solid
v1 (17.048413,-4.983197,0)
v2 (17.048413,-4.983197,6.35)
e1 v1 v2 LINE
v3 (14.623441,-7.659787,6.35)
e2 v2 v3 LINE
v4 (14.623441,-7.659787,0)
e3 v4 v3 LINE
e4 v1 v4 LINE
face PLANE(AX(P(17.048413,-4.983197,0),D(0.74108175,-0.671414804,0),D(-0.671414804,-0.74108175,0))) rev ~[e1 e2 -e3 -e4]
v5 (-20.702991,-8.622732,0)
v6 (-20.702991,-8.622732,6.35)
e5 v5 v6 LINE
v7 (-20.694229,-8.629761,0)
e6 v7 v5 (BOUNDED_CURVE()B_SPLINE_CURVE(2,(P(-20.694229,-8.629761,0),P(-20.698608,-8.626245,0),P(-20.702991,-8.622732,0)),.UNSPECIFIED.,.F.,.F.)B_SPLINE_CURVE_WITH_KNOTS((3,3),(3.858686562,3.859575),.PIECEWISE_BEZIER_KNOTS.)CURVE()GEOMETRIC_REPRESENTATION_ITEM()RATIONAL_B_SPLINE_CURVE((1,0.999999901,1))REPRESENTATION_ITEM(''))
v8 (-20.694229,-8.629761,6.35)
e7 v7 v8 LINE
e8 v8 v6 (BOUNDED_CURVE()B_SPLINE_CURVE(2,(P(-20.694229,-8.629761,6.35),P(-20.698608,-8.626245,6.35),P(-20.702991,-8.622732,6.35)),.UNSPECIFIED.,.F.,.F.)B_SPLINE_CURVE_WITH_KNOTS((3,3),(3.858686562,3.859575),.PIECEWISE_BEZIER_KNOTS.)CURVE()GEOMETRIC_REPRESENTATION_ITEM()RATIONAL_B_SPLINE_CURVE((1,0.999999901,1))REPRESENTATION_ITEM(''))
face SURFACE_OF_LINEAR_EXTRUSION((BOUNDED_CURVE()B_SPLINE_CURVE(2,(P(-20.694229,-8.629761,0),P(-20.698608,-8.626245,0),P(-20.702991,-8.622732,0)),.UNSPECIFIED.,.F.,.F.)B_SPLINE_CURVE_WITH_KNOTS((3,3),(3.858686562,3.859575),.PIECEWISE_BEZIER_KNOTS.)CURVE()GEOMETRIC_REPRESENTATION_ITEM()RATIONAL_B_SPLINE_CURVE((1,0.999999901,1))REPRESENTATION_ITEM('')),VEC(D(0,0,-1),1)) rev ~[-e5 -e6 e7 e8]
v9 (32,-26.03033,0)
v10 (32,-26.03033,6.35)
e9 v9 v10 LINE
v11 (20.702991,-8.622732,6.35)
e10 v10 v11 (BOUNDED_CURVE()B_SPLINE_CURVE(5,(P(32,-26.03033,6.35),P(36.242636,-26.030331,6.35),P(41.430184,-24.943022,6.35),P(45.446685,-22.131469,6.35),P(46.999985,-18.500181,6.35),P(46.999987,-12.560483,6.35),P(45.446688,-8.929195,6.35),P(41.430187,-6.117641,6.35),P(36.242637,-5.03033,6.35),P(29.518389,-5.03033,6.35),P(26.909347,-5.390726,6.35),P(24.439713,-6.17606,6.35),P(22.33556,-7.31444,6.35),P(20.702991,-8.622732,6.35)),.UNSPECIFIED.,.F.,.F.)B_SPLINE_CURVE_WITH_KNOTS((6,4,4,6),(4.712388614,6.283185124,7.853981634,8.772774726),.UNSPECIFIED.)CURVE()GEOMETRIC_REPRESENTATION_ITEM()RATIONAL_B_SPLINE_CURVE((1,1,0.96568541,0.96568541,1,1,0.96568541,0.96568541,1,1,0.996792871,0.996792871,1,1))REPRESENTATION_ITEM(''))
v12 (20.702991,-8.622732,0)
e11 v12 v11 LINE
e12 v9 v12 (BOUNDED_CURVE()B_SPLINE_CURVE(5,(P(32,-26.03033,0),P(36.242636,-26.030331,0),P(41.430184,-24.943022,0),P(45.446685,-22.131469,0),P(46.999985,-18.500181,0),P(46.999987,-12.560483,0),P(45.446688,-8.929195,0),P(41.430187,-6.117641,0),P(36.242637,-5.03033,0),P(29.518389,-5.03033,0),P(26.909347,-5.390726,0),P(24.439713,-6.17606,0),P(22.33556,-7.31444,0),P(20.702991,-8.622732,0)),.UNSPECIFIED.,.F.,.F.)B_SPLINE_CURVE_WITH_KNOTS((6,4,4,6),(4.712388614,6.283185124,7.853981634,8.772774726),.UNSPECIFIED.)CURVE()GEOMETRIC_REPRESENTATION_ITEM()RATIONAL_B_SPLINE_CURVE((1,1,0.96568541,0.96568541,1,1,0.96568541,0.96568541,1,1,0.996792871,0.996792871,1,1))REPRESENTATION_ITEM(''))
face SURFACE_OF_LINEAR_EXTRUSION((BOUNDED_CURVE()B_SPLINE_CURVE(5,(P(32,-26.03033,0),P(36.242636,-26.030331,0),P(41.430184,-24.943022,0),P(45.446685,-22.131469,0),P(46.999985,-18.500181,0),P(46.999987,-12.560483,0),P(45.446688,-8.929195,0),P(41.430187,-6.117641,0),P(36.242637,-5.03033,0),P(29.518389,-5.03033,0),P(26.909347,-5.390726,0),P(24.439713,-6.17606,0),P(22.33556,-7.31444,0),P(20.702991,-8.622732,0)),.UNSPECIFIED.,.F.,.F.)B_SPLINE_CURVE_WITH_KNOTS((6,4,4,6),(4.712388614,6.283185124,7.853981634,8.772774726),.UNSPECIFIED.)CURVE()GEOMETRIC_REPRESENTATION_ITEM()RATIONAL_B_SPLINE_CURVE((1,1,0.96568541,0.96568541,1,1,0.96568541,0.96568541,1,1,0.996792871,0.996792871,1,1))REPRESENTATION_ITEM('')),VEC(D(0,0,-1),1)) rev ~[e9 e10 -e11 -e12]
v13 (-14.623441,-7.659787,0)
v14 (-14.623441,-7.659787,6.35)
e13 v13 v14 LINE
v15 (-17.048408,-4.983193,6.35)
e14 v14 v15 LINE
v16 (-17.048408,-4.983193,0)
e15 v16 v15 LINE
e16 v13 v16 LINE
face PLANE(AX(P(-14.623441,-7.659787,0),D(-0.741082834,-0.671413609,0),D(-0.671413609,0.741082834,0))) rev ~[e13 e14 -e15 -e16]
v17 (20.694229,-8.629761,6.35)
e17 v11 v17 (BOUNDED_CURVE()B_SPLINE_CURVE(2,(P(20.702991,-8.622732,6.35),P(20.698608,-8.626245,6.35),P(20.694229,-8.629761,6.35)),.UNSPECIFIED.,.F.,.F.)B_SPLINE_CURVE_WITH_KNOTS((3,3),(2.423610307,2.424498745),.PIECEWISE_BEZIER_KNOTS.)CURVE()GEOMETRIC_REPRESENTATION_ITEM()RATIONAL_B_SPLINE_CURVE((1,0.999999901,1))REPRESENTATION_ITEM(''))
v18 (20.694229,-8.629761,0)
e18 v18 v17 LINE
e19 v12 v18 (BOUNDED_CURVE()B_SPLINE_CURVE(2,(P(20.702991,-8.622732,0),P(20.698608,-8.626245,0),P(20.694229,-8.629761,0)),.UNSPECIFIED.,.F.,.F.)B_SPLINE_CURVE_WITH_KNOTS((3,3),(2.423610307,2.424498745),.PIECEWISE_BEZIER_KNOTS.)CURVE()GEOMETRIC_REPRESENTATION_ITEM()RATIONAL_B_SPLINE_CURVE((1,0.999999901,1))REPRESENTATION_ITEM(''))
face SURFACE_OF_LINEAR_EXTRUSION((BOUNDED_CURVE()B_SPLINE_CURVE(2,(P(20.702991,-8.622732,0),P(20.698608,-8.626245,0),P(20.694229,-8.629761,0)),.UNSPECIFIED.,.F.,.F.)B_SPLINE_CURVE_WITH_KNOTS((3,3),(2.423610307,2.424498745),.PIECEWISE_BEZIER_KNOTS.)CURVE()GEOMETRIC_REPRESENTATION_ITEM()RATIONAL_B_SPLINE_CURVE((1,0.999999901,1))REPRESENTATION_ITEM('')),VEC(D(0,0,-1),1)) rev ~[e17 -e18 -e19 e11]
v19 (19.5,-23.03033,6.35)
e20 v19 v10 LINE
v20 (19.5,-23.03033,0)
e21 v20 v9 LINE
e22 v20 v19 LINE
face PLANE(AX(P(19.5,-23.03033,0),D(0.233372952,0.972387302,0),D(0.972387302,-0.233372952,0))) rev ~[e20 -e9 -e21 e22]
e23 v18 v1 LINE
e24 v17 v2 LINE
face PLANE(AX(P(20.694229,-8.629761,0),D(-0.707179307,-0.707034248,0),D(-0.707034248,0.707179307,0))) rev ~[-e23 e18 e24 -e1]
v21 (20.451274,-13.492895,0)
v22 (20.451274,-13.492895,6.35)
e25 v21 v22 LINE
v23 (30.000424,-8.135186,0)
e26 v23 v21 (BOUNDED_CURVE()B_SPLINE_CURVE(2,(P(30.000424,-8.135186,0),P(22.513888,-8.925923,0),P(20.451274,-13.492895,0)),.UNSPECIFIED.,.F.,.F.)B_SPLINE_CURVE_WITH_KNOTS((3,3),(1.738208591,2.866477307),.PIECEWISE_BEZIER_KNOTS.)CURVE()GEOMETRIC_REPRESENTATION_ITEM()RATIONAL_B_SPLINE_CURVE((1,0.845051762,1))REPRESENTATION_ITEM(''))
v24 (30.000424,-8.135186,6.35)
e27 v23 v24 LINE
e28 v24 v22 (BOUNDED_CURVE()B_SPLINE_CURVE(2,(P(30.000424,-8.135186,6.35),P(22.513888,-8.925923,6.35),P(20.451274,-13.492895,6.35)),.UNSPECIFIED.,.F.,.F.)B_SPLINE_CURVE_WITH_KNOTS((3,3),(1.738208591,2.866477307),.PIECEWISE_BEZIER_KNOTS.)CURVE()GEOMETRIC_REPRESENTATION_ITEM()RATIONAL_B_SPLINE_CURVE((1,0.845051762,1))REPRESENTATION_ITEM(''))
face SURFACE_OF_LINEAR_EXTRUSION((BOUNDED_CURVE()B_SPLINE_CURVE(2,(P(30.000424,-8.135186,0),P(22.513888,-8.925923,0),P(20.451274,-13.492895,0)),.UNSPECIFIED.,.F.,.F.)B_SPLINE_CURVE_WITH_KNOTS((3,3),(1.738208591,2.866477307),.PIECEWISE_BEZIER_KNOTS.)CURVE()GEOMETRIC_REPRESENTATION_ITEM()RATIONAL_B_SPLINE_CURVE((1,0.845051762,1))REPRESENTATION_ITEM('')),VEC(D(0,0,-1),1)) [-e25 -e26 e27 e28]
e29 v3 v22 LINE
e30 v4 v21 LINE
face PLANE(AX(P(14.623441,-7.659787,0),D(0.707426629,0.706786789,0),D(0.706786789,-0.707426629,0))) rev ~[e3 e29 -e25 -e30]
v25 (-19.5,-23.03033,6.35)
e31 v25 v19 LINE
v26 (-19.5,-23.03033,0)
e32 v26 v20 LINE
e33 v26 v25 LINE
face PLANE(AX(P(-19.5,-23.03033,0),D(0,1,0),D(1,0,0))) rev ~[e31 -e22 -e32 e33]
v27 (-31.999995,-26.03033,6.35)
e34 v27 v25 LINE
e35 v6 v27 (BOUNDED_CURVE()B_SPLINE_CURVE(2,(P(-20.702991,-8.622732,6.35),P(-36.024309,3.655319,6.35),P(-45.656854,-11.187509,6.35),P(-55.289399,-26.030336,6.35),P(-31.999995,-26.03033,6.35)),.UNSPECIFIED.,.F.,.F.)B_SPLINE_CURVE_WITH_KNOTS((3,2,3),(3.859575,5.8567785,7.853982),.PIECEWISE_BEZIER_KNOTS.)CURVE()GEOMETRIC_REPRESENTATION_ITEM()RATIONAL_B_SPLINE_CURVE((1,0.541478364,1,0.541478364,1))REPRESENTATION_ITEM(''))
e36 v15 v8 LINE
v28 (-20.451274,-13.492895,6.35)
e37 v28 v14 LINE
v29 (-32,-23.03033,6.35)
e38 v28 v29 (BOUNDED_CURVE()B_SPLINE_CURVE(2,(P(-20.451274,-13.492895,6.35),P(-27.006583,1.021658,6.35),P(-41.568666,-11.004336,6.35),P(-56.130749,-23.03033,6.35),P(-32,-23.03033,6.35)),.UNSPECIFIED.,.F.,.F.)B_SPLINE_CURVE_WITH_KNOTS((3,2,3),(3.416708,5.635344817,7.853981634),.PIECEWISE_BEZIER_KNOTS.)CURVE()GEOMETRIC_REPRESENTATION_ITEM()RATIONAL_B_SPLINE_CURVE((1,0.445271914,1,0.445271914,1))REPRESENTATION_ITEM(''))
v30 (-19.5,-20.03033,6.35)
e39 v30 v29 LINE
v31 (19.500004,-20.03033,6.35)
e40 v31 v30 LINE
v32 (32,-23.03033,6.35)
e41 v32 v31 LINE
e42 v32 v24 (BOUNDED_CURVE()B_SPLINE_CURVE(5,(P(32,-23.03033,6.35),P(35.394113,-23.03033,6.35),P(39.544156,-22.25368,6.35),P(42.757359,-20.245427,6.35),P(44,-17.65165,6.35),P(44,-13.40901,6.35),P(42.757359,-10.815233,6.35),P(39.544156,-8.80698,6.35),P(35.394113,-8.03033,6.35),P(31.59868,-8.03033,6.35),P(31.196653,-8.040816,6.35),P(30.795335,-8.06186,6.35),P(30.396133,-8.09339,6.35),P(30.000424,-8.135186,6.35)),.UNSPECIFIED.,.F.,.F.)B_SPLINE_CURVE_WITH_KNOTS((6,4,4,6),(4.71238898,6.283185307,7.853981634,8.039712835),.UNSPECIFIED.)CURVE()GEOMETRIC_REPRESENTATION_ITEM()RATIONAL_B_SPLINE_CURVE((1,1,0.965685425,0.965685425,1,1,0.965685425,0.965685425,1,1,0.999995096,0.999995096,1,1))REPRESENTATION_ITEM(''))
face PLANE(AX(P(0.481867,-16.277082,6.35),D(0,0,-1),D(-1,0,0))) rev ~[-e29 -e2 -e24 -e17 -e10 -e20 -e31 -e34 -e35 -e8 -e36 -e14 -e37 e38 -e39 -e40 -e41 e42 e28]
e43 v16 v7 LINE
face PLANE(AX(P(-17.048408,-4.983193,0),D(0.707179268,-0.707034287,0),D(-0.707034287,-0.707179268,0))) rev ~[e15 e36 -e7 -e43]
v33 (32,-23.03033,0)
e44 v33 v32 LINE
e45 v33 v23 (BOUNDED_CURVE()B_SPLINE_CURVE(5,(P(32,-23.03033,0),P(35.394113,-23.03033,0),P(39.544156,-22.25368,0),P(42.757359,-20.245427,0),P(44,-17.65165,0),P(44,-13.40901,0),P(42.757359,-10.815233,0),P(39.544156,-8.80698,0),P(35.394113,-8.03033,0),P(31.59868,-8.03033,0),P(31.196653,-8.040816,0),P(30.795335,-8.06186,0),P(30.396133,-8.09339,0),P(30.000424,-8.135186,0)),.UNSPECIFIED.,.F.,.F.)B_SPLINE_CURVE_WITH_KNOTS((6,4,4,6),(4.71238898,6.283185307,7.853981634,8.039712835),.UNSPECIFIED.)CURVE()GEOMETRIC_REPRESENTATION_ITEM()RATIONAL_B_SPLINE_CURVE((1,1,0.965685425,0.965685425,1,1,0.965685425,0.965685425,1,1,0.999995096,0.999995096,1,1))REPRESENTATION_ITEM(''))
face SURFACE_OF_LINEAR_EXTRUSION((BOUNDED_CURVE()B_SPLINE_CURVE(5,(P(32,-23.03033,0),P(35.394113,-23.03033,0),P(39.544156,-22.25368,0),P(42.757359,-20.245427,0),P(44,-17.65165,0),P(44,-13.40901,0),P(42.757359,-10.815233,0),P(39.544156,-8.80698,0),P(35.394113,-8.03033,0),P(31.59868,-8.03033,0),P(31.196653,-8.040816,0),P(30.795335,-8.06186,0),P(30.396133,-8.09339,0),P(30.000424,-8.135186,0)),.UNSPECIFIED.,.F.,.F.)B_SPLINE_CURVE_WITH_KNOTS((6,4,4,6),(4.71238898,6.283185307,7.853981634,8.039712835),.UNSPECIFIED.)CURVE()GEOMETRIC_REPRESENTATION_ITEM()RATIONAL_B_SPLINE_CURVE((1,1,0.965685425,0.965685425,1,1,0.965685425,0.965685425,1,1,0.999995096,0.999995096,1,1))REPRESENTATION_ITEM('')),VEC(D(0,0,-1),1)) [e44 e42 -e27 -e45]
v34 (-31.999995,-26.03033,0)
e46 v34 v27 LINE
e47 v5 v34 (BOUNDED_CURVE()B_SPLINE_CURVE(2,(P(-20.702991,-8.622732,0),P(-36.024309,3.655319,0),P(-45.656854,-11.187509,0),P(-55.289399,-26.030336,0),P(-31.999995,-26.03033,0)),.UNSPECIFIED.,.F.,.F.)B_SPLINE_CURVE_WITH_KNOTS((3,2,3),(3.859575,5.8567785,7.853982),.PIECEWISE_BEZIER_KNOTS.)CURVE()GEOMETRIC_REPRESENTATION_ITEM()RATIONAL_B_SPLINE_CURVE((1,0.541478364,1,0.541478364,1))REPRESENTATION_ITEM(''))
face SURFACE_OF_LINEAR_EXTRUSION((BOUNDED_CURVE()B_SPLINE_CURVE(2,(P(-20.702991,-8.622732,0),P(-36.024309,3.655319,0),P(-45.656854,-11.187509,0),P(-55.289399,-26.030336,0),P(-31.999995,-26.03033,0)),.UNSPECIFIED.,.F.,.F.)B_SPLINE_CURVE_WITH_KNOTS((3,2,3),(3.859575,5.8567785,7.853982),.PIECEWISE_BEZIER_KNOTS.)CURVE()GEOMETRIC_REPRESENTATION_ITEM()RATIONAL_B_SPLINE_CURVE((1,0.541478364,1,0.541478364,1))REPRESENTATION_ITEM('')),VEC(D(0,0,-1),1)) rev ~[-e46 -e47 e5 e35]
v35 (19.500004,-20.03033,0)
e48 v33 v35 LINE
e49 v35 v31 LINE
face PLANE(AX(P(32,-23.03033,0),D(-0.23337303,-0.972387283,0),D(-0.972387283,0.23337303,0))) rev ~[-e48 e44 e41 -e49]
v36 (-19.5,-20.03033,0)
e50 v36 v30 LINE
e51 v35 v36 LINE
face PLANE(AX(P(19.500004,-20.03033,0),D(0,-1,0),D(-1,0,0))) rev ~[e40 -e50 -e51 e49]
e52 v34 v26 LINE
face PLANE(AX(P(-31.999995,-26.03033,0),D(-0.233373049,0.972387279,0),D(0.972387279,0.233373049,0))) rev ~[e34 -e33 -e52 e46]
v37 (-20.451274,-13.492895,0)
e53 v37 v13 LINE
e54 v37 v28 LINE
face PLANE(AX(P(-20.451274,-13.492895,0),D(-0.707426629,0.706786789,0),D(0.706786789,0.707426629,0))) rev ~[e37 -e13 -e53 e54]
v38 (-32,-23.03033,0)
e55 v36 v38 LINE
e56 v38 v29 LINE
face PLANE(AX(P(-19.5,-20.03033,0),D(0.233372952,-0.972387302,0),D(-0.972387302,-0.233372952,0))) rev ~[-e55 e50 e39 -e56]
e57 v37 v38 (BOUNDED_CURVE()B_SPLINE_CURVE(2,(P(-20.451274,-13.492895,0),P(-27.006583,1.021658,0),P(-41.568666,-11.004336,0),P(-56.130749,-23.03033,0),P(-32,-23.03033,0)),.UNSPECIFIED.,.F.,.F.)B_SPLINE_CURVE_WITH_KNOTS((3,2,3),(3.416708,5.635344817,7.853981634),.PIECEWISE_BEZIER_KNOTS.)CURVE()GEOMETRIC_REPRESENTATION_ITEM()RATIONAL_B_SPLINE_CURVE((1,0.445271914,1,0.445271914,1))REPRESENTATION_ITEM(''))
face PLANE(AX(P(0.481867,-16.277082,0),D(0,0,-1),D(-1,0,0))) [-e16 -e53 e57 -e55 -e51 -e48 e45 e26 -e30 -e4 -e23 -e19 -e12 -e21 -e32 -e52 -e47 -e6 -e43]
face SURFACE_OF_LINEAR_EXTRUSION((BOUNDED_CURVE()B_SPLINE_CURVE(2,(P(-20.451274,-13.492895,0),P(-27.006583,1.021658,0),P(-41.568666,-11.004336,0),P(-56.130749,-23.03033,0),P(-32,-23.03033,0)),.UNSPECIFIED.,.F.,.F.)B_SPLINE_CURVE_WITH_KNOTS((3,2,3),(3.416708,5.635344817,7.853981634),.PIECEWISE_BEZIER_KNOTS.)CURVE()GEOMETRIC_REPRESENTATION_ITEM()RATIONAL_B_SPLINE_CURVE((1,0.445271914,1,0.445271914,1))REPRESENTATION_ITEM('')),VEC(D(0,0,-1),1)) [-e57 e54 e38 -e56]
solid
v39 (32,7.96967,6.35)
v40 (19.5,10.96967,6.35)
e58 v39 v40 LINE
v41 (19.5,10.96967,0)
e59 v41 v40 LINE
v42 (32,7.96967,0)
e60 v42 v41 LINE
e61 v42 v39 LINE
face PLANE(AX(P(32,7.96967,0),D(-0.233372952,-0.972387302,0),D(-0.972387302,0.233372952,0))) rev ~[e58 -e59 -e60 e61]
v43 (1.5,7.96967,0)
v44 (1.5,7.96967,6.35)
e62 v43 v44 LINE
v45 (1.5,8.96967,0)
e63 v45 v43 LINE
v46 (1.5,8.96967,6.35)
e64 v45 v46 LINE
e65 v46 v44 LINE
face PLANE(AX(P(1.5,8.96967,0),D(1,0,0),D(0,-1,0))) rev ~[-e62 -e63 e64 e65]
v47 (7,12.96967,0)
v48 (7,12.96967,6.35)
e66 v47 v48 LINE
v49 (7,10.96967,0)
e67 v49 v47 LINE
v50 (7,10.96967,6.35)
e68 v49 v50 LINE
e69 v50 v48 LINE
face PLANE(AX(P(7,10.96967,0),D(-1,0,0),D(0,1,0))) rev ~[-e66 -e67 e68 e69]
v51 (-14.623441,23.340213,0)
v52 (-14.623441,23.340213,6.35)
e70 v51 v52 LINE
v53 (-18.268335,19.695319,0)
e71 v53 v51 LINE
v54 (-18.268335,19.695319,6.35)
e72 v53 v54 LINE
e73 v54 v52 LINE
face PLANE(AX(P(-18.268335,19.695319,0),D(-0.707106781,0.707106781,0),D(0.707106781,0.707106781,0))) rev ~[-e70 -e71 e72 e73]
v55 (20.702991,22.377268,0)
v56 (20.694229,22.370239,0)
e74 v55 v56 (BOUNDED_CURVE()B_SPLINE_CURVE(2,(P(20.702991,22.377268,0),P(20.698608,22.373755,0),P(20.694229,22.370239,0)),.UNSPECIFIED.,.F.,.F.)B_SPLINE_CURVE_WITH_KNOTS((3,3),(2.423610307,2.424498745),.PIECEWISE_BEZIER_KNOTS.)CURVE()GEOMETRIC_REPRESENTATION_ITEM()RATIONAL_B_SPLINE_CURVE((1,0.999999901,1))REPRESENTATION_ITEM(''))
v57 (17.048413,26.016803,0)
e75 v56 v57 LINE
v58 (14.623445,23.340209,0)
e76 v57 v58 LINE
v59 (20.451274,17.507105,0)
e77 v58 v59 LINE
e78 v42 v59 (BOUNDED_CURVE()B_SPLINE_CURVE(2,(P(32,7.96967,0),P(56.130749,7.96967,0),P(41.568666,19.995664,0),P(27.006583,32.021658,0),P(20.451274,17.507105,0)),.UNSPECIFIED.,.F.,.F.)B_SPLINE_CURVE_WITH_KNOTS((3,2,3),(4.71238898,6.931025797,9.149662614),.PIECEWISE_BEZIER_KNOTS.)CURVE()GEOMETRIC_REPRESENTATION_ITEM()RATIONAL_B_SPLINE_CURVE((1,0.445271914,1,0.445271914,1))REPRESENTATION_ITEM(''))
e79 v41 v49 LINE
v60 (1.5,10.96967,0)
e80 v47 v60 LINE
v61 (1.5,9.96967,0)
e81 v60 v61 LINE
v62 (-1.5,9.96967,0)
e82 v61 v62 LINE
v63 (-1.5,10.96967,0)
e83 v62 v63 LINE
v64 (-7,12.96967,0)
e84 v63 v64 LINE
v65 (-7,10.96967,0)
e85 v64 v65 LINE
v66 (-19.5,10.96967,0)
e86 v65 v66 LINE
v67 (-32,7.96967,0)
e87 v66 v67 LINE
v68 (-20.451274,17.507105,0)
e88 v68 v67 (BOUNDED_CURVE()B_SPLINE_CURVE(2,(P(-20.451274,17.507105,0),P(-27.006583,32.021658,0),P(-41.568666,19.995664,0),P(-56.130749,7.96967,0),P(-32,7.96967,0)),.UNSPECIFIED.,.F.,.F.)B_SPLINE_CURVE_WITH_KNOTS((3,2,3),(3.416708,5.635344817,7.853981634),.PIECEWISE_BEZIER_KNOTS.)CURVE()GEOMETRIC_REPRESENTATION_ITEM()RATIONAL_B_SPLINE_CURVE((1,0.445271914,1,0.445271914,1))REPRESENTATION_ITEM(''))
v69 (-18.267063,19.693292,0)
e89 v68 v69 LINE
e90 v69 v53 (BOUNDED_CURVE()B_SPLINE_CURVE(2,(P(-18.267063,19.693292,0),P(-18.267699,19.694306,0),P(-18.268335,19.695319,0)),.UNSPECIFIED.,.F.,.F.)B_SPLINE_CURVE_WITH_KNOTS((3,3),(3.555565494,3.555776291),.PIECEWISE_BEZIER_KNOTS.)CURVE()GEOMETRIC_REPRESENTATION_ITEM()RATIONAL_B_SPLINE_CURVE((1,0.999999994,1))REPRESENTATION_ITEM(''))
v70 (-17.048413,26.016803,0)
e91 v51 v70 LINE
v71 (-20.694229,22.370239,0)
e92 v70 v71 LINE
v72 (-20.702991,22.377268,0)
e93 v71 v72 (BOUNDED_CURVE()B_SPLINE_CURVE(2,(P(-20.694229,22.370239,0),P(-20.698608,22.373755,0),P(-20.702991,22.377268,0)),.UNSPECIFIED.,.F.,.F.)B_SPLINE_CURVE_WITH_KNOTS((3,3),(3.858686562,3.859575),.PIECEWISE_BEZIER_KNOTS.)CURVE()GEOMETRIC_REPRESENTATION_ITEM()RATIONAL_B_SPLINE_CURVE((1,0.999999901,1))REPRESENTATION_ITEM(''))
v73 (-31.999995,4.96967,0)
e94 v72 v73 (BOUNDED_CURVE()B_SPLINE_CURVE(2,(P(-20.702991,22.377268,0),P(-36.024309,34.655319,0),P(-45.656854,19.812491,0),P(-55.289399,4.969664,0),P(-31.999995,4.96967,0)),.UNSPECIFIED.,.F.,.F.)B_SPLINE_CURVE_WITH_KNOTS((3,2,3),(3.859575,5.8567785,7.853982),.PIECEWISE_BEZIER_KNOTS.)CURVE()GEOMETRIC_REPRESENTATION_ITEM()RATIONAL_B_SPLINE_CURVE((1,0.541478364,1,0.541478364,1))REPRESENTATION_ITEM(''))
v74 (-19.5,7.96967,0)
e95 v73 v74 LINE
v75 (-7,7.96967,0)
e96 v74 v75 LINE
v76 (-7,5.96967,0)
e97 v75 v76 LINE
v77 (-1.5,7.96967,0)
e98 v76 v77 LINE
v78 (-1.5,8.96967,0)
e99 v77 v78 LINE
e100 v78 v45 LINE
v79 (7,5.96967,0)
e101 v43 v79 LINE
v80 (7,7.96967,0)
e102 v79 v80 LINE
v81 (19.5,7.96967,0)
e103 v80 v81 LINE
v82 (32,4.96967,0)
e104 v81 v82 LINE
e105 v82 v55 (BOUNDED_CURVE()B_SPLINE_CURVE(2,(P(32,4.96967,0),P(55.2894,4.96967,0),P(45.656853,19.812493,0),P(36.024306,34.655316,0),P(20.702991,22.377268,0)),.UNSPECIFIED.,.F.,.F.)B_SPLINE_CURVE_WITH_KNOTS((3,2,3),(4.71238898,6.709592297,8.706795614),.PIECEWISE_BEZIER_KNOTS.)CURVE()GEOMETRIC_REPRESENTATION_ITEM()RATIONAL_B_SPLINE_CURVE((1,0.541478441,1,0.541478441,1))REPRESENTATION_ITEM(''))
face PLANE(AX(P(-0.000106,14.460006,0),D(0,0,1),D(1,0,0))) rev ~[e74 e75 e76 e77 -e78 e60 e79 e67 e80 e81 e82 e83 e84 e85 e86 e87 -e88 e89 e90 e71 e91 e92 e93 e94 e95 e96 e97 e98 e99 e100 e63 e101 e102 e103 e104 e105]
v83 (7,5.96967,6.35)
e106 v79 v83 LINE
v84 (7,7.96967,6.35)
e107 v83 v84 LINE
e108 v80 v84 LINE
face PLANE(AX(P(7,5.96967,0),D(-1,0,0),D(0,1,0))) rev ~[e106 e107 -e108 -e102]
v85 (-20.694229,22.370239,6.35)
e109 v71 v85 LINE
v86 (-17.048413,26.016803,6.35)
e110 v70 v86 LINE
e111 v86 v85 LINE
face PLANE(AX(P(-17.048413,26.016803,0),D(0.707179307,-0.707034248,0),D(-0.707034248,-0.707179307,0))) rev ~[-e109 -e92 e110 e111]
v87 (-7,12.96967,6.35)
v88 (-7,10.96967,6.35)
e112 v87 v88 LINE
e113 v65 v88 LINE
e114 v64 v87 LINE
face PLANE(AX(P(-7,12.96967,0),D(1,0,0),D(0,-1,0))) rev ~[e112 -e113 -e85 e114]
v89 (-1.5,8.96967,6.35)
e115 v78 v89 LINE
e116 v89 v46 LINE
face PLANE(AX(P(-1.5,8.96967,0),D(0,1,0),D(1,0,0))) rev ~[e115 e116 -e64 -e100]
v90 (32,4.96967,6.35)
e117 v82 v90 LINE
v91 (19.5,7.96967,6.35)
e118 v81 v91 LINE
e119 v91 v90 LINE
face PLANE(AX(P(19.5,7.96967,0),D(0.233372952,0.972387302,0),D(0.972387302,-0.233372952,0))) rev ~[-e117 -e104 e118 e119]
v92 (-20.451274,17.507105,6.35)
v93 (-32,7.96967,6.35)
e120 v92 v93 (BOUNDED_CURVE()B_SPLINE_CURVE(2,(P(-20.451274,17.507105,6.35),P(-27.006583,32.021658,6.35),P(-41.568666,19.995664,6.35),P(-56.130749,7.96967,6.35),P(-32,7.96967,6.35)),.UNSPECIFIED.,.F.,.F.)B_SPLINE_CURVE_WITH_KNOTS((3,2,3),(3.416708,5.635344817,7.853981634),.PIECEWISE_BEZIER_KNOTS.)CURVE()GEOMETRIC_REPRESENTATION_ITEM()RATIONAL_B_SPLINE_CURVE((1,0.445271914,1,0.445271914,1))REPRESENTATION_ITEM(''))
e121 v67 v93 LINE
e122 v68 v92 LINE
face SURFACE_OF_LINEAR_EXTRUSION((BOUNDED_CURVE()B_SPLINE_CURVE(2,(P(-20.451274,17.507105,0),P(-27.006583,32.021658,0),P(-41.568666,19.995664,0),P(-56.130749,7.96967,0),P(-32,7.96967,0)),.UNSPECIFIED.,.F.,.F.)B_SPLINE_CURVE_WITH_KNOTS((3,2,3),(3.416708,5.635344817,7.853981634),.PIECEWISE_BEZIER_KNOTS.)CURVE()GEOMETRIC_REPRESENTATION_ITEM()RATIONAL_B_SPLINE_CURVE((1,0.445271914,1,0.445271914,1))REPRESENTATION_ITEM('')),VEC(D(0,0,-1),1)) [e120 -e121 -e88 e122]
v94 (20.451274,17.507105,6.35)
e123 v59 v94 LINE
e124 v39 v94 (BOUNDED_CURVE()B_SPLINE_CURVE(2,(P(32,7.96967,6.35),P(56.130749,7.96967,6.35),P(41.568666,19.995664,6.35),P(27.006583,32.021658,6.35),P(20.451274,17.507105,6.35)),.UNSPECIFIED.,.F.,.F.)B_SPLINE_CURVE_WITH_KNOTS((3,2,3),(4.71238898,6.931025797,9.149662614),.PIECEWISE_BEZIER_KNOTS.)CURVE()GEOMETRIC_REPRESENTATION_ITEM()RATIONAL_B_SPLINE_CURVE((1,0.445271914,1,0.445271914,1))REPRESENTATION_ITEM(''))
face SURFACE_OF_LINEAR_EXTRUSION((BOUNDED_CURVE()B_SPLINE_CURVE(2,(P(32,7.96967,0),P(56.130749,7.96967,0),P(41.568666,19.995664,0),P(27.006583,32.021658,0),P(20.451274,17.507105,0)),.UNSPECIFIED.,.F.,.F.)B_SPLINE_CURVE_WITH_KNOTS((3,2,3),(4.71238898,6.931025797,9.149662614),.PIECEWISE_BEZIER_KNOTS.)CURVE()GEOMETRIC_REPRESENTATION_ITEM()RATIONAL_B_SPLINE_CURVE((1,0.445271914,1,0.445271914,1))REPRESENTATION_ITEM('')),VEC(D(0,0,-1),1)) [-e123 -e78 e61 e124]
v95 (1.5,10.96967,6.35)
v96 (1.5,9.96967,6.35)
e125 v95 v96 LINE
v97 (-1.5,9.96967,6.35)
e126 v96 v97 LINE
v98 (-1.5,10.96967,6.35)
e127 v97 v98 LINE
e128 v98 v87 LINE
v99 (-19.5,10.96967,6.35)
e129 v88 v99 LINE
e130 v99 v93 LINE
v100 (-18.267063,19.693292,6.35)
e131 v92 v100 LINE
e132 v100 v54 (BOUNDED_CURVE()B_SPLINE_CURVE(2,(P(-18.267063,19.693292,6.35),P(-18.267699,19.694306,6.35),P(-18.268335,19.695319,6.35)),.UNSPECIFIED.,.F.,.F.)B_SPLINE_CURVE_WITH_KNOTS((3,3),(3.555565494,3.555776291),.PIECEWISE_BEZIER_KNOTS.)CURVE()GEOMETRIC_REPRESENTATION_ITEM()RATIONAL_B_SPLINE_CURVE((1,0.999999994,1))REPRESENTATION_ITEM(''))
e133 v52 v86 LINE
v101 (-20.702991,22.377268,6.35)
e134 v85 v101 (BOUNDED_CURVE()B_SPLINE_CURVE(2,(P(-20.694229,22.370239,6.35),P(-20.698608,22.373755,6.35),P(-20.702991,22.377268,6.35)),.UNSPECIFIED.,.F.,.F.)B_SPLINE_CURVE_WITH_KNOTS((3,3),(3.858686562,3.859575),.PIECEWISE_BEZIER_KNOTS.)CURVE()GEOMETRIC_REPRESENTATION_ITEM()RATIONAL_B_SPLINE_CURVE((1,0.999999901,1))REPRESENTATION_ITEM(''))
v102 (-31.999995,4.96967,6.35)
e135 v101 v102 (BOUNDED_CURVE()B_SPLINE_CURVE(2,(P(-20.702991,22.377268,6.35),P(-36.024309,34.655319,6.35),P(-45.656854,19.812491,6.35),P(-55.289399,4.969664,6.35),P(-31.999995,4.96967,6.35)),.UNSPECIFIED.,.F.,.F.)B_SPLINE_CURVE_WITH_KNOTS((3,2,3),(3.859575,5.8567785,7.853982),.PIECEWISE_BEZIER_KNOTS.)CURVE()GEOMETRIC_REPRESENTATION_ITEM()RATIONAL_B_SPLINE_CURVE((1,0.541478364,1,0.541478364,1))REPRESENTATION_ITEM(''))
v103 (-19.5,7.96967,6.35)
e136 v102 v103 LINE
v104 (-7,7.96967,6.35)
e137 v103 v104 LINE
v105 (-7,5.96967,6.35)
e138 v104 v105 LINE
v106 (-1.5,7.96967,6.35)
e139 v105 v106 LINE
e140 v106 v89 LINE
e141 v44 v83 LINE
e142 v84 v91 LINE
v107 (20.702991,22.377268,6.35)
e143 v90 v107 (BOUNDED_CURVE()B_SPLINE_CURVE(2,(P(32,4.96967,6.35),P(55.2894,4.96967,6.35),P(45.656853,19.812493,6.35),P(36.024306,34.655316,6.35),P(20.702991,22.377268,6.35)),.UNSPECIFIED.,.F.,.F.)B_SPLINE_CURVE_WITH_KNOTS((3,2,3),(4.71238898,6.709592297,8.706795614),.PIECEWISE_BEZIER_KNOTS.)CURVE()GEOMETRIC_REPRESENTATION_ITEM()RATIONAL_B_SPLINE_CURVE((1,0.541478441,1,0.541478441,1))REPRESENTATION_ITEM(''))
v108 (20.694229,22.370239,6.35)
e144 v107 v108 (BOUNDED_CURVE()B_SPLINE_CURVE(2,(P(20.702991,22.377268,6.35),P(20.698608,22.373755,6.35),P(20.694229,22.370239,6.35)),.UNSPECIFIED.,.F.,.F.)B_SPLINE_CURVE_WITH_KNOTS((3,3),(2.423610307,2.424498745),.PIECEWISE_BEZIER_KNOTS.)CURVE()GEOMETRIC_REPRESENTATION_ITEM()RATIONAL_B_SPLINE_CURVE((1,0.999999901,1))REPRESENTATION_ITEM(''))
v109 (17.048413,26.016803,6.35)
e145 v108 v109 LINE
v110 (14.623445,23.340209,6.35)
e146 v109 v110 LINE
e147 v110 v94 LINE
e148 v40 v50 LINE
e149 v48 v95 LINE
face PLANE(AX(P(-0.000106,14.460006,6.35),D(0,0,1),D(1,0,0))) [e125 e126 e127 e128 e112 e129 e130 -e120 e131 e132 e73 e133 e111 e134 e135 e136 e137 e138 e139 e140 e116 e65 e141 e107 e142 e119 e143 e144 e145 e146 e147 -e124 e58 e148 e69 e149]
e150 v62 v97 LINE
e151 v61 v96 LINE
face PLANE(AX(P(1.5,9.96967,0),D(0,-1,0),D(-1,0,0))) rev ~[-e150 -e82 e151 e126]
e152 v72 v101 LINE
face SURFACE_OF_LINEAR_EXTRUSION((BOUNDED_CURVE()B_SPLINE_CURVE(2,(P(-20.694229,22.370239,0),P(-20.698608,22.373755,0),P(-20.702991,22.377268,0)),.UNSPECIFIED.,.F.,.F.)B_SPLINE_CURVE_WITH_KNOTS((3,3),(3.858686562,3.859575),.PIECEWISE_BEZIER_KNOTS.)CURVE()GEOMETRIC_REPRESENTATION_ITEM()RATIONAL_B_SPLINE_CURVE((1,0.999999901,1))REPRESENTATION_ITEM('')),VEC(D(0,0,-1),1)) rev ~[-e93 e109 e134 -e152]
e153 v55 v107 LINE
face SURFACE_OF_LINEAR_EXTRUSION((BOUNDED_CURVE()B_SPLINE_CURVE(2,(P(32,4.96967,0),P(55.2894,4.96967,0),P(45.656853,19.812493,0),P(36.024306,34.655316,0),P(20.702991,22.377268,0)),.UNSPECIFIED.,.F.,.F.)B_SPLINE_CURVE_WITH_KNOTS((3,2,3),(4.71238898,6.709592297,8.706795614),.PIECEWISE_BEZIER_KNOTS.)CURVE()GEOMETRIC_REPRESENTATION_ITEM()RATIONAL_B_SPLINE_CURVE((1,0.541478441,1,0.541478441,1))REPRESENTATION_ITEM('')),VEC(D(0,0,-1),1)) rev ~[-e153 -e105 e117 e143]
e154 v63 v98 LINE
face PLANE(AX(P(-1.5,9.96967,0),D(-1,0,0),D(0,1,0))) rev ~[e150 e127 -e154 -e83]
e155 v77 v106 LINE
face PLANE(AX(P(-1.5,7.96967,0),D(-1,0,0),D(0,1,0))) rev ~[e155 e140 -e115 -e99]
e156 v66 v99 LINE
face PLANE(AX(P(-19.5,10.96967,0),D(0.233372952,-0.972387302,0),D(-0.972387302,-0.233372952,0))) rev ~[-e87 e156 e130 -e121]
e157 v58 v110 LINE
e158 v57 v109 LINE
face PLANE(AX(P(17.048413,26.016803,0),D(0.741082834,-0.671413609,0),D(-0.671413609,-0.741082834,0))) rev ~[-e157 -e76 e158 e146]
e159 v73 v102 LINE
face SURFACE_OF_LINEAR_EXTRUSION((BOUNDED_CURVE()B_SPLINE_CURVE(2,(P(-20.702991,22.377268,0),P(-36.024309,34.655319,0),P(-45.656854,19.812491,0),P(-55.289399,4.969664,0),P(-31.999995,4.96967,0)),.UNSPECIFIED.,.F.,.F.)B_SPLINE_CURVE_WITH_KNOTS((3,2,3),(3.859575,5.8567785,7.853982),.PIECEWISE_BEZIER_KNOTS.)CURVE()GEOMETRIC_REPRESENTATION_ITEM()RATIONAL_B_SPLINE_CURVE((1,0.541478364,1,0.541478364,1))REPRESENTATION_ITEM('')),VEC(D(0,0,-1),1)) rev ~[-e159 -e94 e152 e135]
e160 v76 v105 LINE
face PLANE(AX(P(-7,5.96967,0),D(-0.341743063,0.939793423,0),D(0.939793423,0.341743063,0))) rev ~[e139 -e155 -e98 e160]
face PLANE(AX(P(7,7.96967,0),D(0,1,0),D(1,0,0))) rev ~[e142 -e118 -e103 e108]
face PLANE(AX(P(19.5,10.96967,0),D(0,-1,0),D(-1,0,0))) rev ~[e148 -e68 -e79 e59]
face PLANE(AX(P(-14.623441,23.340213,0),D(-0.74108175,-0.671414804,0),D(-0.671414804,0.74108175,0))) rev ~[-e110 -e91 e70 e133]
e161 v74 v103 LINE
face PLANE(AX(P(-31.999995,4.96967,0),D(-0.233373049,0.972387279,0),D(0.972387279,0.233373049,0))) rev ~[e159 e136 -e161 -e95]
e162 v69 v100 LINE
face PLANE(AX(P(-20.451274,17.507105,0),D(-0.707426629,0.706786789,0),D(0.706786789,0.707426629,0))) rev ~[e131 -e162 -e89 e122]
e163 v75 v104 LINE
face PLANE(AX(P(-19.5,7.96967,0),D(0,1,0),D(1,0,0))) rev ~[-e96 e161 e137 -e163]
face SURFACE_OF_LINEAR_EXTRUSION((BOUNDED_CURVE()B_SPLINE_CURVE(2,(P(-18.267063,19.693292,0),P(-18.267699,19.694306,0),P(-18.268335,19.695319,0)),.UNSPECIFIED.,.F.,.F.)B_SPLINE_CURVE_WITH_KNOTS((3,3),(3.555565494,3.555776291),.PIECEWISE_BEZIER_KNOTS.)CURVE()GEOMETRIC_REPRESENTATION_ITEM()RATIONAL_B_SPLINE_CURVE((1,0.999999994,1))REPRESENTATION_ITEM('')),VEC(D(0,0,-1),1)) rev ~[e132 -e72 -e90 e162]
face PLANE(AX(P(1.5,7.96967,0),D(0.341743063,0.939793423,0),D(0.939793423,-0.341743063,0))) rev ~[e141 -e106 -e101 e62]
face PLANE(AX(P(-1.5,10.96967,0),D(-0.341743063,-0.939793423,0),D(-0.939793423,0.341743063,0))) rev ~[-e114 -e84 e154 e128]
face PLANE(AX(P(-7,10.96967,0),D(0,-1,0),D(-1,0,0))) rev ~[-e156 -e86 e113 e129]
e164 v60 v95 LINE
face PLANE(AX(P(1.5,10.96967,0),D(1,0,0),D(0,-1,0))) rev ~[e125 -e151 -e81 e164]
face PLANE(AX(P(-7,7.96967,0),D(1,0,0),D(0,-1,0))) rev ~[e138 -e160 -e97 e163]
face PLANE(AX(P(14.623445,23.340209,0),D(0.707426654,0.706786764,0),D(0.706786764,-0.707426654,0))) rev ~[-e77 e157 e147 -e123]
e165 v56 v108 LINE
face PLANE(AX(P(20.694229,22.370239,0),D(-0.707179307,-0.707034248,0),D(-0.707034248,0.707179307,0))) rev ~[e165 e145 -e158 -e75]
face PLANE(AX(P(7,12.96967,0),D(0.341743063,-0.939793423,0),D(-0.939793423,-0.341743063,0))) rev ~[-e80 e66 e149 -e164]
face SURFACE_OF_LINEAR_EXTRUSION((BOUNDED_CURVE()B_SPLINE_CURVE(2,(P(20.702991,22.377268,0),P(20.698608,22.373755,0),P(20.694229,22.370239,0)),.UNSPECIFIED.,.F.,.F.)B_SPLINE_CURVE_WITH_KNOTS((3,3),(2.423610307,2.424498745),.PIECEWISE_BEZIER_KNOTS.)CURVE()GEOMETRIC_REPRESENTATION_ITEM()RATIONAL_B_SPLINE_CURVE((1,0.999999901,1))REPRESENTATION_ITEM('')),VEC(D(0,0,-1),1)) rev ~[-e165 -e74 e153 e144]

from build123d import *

# Parameters (mm, degrees)
F1_DEPTH = 6.35
F2_DEPTH = 6.35


# Not quite as in the source:
# - ends of sketch curves that miss each other by under 0.0002 mm in the source are joined


with BuildPart() as f1:
    # F0 (on Top) → F1 (new body)
    with BuildSketch(Plane.XY):
        with BuildLine():
            add(Edge.make_bspline(
                [(-20.4512735689, -13.4928953942), (-27.006583317, 1.0216576775), (-41.568666167, -11.0043361613), (-56.130749017, -23.03033), (-32, -23.03033)],
                knots=[3.416708, 3.416708, 3.416708, 5.635344817, 5.635344817, 7.853981634, 7.853981634, 7.853981634], degree=2, weights=[1, 0.445271914, 1, 0.445271914, 1]))
            Line((-20.4512735689, -13.4928953942), (-14.623441, -7.659787))
            Line((-14.623441, -7.659787), (-17.0484084715, -4.9831928082))
            Line((-17.0484084715, -4.9831928082), (-20.6942287896, -8.6297607204))
            add(Edge.make_bspline(
                [(-20.6942287896, -8.6297607204), (-20.698607878, -8.6262451494), (-20.7029914266, -8.6227323031)],
                knots=[3.8586865618, 3.8586865618, 3.8586865618, 3.859575, 3.859575, 3.859575], degree=2, weights=[1, 0.9999999013, 1]))
            add(Edge.make_bspline(
                [(-20.7029914266, -8.6227323031), (-36.0243090451, 3.6553185791), (-45.6568538904, -11.1875086941), (-55.2893987358, -26.0303359672), (-31.9999945096, -26.03033)],
                knots=[3.859575, 3.859575, 3.859575, 5.8567785, 5.8567785, 7.853982, 7.853982, 7.853982], degree=2, weights=[1, 0.5414783641, 1, 0.5414783641, 1]))
            Line((-31.9999945096, -26.03033), (-19.5, -23.03033))
            Line((-19.5, -23.03033), (0, -23.03033))
            Line((0, -23.03033), (19.5, -23.03033))
            Line((19.5, -23.03033), (32, -26.03033))
            add(Edge.make_bspline(
                [(32, -26.03033), (46.9999832548, -26.0303338433), (46.999986, -15.5303319216), (46.9999887452, -5.03033), (32, -5.03033)],
                knots=[4.7123886144, 4.7123886144, 4.7123886144, 6.2831851242, 6.2831851242, 7.853981634, 7.853981634, 7.853981634], degree=2, weights=[1, 0.7071067165, 1, 0.7071067165, 1]))
            add(Edge.make_bspline(
                [(32, -5.03033), (25.1858150627, -5.03033), (20.7029914266, -8.6227323031)],
                knots=[1.5707963268, 1.5707963268, 1.5707963268, 2.4236103072, 2.4236103072, 2.4236103072], degree=2, weights=[1, 0.9104577001, 1]))
            add(Edge.make_bspline(
                [(20.7029914266, -8.6227323031), (20.698607878, -8.6262451494), (20.6942287896, -8.6297607204)],
                knots=[2.4236103072, 2.4236103072, 2.4236103072, 2.4244987453, 2.4244987453, 2.4244987453], degree=2, weights=[1, 0.9999999013, 1]))
            Line((20.6942287896, -8.6297607204), (17.0484127896, -4.9831967204))
            Line((17.0484127896, -4.9831967204), (14.623441, -7.659787))
            Line((14.623441, -7.659787), (20.4512735689, -13.4928953942))
            add(Edge.make_bspline(
                [(30.0004237684, -8.1351855073), (22.5138875018, -8.9259228869), (20.4512735689, -13.4928953942)],
                knots=[1.7382085912, 1.7382085912, 1.7382085912, 2.8664773072, 2.8664773072, 2.8664773072], degree=2, weights=[1, 0.8450517623, 1]))
            add(Edge.make_bspline(
                [(32, -8.03033), (30.9931737994, -8.03033), (30.0004237684, -8.1351855073)],
                knots=[1.5707963268, 1.5707963268, 1.5707963268, 1.7382085912, 1.7382085912, 1.7382085912], degree=2, weights=[1, 0.9964986868, 1]))
            add(Edge.make_bspline(
                [(32, -23.03033), (44, -23.03033), (44, -15.53033), (44, -8.03033), (32, -8.03033)],
                knots=[4.7123889804, 4.7123889804, 4.7123889804, 6.2831853072, 6.2831853072, 7.853981634, 7.853981634, 7.853981634], degree=2, weights=[1, 0.7071067812, 1, 0.7071067812, 1]))
            Line((32, -23.03033), (19.5000043923, -20.03033))
            Line((19.5000043923, -20.03033), (0, -20.03033))
            Line((0, -20.03033), (-19.5, -20.03033))
            Line((-19.5, -20.03033), (-32, -23.03033))
        make_face()
    extrude(amount=F1_DEPTH)


with BuildPart() as f2:
    # F0 (on Top) → F2 (new body)
    with BuildSketch(Plane.XY):
        with BuildLine():
            add(Edge.make_bspline(
                [(-18.2670631482, 19.6932923503), (-18.2676990936, 19.69430555), (-18.2683353441, 19.6953186559)],
                knots=[3.5555654943, 3.5555654943, 3.5555654943, 3.5557762907, 3.5557762907, 3.5557762907], degree=2, weights=[1, 0.9999999944, 1]))
            Line((-18.2683353441, 19.6953186559), (-14.623441, 23.340213))
            Line((-14.623441, 23.340213), (-17.0484127896, 26.0168032796))
            Line((-17.0484127896, 26.0168032796), (-20.6942287896, 22.3702392796))
            add(Edge.make_bspline(
                [(-20.6942287896, 22.3702392796), (-20.698607878, 22.3737548506), (-20.7029914266, 22.3772676969)],
                knots=[3.8586865618, 3.8586865618, 3.8586865618, 3.859575, 3.859575, 3.859575], degree=2, weights=[1, 0.9999999013, 1]))
            add(Edge.make_bspline(
                [(-20.7029914266, 22.3772676969), (-36.0243090451, 34.6553185791), (-45.6568538904, 19.8124913059), (-55.2893987358, 4.9696640328), (-31.9999945096, 4.96967)],
                knots=[3.859575, 3.859575, 3.859575, 5.8567785, 5.8567785, 7.853982, 7.853982, 7.853982], degree=2, weights=[1, 0.5414783641, 1, 0.5414783641, 1]))
            Line((-31.9999945096, 4.96967), (-19.5, 7.96967))
            Line((-19.5, 7.96967), (-7, 7.96967))
            Line((-7, 7.96967), (-7, 5.96967))
            Line((-7, 5.96967), (-1.5, 7.96967))
            Line((-1.5, 7.96967), (-1.5, 8.96967))
            Line((-1.5, 8.96967), (0, 8.96967))
            Line((0, 8.96967), (1.5, 8.96967))
            Line((1.5, 8.96967), (1.5, 7.96967))
            Line((1.5, 7.96967), (7, 5.96967))
            Line((7, 5.96967), (7, 7.96967))
            Line((7, 7.96967), (19.5, 7.96967))
            Line((19.5, 7.96967), (32, 4.96967))
            add(Edge.make_bspline(
                [(32, 4.96967), (55.2893995447, 4.96967), (45.656852755, 19.8124930555), (36.0243059653, 34.655316111), (20.7029914266, 22.3772676969)],
                knots=[4.7123889804, 4.7123889804, 4.7123889804, 6.7095922974, 6.7095922974, 8.7067956144, 8.7067956144, 8.7067956144], degree=2, weights=[1, 0.541478441, 1, 0.541478441, 1]))
            add(Edge.make_bspline(
                [(20.7029914266, 22.3772676969), (20.698607878, 22.3737548506), (20.6942287896, 22.3702392796)],
                knots=[2.4236103072, 2.4236103072, 2.4236103072, 2.4244987453, 2.4244987453, 2.4244987453], degree=2, weights=[1, 0.9999999013, 1]))
            Line((20.6942287896, 22.3702392796), (17.0484127896, 26.0168032796))
            Line((17.0484127896, 26.0168032796), (14.6234453181, 23.3402090878))
            Line((14.6234453181, 23.3402090878), (20.4512735689, 17.5071046058))
            add(Edge.make_bspline(
                [(32, 7.96967), (56.130749017, 7.96967), (41.568666167, 19.9956638387), (27.006583317, 32.0216576775), (20.4512735689, 17.5071046058)],
                knots=[4.7123889804, 4.7123889804, 4.7123889804, 6.9310257974, 6.9310257974, 9.1496626144, 9.1496626144, 9.1496626144], degree=2, weights=[1, 0.445271914, 1, 0.445271914, 1]))
            Line((32, 7.96967), (19.5, 10.96967))
            Line((19.5, 10.96967), (7, 10.96967))
            Line((7, 10.96967), (7, 12.96967))
            Line((7, 12.96967), (1.5, 10.96967))
            Line((1.5, 10.96967), (1.5, 9.96967))
            Line((1.5, 9.96967), (0, 9.96967))
            Line((0, 9.96967), (-1.5, 9.96967))
            Line((-1.5, 9.96967), (-1.5, 10.96967))
            Line((-1.5, 10.96967), (-7, 12.96967))
            Line((-7, 12.96967), (-7, 10.96967))
            Line((-7, 10.96967), (-19.5, 10.96967))
            Line((-19.5, 10.96967), (-32, 7.96967))
            add(Edge.make_bspline(
                [(-20.4512735689, 17.5071046058), (-27.006583317, 32.0216576775), (-41.568666167, 19.9956638387), (-56.130749017, 7.96967), (-32, 7.96967)],
                knots=[3.416708, 3.416708, 3.416708, 5.635344817, 5.635344817, 7.853981634, 7.853981634, 7.853981634], degree=2, weights=[1, 0.445271914, 1, 0.445271914, 1]))
            Line((-20.4512735689, 17.5071046058), (-18.2670631482, 19.6932923503))
        make_face()
    extrude(amount=F2_DEPTH)


solid = Compound([f1.part, f2.part])
